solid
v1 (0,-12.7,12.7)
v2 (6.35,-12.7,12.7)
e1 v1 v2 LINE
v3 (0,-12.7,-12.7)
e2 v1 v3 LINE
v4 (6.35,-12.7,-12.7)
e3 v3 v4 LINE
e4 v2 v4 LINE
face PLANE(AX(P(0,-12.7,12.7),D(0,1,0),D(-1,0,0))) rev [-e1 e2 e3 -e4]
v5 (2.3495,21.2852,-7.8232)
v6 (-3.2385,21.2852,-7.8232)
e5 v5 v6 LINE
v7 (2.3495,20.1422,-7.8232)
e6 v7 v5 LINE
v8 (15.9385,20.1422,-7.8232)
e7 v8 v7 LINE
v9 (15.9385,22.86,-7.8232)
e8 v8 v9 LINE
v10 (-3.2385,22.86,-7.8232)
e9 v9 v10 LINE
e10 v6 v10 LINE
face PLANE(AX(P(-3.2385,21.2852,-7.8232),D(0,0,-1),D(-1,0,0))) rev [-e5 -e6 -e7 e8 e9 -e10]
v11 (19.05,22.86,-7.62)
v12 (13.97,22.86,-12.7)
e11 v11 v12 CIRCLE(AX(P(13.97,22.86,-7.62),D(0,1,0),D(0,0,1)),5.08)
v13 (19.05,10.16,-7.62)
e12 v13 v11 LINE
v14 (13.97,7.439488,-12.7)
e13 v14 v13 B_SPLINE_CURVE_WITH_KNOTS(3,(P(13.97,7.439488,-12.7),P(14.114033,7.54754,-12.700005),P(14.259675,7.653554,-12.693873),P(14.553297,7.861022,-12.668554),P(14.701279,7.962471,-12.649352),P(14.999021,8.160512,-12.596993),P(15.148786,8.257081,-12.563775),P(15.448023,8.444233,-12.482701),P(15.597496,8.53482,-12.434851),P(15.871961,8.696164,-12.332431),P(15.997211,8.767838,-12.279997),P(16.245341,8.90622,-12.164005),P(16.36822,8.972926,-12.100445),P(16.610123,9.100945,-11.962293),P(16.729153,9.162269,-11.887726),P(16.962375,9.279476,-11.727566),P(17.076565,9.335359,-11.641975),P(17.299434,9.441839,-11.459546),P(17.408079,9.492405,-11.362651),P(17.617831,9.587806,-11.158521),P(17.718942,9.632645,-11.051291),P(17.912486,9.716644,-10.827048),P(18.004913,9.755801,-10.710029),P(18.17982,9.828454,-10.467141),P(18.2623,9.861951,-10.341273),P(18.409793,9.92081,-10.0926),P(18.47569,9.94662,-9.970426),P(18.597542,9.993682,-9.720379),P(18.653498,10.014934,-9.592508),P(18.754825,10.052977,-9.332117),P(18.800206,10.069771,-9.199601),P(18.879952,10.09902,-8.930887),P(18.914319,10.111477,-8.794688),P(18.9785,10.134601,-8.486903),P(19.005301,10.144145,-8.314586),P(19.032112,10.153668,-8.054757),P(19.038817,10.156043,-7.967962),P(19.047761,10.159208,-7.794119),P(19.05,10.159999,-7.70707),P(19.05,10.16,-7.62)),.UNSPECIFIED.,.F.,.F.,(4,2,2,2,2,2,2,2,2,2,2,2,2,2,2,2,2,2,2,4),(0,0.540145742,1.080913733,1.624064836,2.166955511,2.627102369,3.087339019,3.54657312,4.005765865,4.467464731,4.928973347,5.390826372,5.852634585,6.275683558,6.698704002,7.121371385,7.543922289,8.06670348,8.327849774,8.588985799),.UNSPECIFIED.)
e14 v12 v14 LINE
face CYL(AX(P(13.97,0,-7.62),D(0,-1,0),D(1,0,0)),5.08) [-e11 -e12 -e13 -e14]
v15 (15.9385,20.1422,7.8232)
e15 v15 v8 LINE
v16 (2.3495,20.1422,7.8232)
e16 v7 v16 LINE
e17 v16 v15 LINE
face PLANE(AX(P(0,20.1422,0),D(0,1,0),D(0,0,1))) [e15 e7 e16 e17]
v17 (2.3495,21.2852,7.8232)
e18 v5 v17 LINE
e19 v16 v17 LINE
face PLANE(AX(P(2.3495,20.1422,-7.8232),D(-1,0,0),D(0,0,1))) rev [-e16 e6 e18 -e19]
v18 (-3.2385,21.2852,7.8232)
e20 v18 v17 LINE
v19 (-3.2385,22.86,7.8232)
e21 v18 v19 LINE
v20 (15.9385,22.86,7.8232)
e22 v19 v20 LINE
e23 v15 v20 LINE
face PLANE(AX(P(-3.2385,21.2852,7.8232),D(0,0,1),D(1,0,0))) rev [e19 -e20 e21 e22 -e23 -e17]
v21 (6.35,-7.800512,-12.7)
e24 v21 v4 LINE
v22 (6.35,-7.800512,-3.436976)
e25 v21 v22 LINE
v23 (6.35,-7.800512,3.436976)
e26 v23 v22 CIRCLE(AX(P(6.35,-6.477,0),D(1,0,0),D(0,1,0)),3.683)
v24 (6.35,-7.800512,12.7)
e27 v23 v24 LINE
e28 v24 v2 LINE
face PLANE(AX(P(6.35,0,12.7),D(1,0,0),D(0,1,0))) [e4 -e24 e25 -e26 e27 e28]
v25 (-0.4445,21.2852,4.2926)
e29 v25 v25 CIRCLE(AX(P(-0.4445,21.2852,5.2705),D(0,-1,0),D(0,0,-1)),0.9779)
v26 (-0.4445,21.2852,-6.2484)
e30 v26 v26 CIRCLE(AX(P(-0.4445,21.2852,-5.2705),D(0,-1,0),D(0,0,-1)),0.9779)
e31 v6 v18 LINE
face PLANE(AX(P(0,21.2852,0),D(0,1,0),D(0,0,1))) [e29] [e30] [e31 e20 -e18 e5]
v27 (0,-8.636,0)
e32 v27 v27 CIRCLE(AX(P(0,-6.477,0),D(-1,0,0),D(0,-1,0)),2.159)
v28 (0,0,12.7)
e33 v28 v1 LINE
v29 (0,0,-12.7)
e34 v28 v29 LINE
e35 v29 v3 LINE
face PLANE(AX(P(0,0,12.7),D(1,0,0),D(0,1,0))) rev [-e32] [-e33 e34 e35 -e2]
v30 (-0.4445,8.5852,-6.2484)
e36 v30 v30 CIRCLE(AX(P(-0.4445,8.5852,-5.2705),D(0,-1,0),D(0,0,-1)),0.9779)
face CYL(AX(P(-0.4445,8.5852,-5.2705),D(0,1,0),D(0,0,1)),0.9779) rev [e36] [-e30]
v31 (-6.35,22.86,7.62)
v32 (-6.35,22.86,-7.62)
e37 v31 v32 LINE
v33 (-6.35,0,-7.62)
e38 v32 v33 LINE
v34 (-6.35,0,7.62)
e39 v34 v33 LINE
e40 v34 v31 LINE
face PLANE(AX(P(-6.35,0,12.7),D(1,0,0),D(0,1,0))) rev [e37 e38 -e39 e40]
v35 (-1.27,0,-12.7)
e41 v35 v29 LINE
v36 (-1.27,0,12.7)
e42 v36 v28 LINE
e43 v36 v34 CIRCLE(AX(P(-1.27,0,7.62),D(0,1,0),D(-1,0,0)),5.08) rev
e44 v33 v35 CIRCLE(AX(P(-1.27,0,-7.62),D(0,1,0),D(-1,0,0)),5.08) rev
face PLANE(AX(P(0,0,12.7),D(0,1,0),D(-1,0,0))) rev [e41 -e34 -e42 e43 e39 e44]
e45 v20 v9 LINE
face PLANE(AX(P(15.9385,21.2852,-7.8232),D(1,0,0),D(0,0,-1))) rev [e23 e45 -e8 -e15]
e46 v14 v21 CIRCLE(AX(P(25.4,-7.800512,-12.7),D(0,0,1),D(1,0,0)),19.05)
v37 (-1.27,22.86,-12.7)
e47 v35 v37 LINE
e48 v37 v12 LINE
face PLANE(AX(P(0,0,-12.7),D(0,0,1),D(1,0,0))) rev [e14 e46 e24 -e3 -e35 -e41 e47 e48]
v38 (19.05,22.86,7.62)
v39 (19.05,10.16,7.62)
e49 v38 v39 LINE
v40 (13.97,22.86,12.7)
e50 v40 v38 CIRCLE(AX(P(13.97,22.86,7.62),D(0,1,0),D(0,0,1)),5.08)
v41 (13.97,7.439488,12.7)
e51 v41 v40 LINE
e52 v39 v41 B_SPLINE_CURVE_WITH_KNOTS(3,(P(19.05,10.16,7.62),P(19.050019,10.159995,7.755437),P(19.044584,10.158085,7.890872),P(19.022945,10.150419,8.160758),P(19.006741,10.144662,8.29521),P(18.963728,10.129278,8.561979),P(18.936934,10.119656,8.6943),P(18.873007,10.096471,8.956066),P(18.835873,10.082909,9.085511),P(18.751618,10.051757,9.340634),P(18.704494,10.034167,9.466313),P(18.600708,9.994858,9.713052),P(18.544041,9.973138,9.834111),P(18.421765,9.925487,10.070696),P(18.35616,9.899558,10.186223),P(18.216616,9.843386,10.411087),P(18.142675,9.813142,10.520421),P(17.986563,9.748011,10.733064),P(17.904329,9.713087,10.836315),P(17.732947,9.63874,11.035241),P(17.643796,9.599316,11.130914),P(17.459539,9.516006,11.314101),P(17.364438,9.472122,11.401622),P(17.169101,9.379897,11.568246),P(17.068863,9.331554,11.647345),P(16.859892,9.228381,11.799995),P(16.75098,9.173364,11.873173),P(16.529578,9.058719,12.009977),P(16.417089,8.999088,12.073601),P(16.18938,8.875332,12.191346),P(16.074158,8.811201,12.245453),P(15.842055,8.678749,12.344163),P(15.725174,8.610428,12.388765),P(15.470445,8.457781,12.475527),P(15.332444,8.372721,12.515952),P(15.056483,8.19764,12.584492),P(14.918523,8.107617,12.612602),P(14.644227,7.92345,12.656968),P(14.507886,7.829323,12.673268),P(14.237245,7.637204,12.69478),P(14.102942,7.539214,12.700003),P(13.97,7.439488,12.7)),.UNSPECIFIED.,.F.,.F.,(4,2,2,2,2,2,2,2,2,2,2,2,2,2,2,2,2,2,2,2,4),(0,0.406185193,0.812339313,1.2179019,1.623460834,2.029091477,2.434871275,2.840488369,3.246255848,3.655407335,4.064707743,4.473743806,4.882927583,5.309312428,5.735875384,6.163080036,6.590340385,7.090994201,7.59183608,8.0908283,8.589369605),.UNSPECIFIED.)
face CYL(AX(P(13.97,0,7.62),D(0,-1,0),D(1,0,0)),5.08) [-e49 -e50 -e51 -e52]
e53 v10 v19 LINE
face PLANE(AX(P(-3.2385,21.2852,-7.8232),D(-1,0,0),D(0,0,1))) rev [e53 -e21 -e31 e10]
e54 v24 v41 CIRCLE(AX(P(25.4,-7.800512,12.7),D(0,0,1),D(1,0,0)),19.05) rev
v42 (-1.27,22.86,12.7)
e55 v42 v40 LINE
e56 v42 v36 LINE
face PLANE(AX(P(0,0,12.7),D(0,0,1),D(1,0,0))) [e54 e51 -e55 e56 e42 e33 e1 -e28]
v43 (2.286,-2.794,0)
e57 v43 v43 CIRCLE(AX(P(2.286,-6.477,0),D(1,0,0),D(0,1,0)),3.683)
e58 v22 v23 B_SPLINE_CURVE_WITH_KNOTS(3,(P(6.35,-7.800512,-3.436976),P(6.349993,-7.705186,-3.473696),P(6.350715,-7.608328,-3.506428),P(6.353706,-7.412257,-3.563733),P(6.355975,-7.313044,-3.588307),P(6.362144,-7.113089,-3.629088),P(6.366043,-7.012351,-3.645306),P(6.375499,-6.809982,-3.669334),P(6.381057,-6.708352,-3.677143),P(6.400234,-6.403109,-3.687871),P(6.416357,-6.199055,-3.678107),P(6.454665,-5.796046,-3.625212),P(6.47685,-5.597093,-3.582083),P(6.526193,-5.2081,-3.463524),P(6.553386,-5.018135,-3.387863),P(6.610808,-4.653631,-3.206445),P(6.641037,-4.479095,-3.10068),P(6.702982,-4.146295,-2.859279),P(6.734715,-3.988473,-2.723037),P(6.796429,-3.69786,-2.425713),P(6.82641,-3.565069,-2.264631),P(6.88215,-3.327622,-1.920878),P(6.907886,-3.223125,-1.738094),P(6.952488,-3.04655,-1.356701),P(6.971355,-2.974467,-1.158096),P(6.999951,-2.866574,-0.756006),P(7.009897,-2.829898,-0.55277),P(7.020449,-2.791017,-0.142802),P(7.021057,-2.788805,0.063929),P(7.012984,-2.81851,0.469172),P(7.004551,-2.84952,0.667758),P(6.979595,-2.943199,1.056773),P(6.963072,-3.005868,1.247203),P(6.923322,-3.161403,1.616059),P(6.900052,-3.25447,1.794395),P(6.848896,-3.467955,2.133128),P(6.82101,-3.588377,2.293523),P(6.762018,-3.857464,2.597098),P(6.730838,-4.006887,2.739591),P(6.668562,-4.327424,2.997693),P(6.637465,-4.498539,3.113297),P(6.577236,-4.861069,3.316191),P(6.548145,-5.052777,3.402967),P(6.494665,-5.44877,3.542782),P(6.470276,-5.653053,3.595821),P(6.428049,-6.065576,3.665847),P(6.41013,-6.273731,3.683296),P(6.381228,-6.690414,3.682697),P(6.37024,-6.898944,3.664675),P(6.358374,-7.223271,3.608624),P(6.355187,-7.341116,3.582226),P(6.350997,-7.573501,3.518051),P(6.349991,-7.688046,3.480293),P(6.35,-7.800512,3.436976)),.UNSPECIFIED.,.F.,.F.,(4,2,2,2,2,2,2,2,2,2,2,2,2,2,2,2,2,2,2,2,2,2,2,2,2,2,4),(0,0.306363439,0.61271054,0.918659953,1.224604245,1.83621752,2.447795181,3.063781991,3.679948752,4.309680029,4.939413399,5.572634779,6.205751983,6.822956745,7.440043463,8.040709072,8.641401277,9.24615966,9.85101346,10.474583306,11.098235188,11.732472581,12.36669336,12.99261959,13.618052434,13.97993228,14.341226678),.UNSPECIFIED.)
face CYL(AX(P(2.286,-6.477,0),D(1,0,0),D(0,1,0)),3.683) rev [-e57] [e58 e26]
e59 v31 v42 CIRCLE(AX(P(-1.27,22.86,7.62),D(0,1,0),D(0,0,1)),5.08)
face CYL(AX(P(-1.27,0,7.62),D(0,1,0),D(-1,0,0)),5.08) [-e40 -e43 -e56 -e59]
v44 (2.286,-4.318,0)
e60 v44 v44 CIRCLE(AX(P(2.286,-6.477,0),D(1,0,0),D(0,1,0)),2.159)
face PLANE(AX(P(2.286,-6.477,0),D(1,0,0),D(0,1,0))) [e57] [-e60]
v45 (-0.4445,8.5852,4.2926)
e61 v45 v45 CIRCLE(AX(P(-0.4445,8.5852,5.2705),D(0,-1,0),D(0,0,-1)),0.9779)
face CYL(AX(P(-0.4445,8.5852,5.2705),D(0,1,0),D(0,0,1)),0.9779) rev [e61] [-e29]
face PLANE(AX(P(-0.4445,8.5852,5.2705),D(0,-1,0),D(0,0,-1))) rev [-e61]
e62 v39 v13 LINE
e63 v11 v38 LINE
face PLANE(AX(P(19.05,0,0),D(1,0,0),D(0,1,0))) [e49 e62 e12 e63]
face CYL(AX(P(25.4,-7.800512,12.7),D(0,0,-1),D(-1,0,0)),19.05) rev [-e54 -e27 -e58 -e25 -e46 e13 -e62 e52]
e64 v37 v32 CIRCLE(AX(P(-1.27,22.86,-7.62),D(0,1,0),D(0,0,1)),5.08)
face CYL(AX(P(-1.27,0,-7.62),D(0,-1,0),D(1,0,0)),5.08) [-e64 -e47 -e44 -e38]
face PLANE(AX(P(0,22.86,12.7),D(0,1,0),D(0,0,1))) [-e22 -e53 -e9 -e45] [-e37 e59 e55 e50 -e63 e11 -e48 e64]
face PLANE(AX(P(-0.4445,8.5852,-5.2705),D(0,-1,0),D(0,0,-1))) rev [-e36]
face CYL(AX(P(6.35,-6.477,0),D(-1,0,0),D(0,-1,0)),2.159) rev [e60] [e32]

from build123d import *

# Parameters (mm, degrees)
PROFILE_W               = 12.7
PROFILE_H               = 22.86
PROFILE_W_2             = 6.35
PROFILE_H_2             = 12.7
BOSS_EXTRUDE1_DEPTH     = 12.7
CUT_EXTRUDE1_DEPTH      = 27.910817528
CUT_EXTRUDE1_DEPTH_BACK = 27.910817528
SCREWHOLE_R             = 2.159
CUT_EXTRUDE2_START      = -4.064
SKETCH3_R               = 3.683
SKETCH3_R_2             = 2.159
CUT_EXTRUDE2_DEPTH      = 4.064
SKETCH4_W               = 25.4
SKETCH4_H               = 12.7
BOSS_EXTRUDE2_DEPTH     = 12.7
SKETCH6_W               = 19.177
SKETCH6_H               = 15.6464
CUT_EXTRUDE3_DEPTH      = 1.5748
SKETCH9_W               = 13.589
SKETCH9_H               = 15.6464
CUT_EXTRUDE5_DEPTH      = 1.143
SKETCH7_R               = 0.9779
CUT_EXTRUDE6_DEPTH      = 12.7
FILLET1_R               = 19.05
FILLET2_R               = 5.08


with BuildPart() as part:
    # Profile → Boss-Extrude1 (new, symmetric)
    with BuildSketch(Plane.XY):
        with Locations((0, 11.43)):
            Rectangle(PROFILE_W, PROFILE_H)
        with Locations((3.175, -6.35)):
            Rectangle(PROFILE_W_2, PROFILE_H_2)
    extrude(amount=BOSS_EXTRUDE1_DEPTH, both=True)

    # ScrewHole → Cut-Extrude1 (cut, two sides: drawn at the far end of the back side and taken through both)
    with BuildSketch(Plane.ZY.offset(-CUT_EXTRUDE1_DEPTH_BACK)):
        with Locations(Location((0, -6.477, 0), (0, 0, 270))):
            Circle(SCREWHOLE_R)
    extrude(amount=CUT_EXTRUDE1_DEPTH + CUT_EXTRUDE1_DEPTH_BACK, mode=Mode.SUBTRACT)

    # Sketch3 → Cut-Extrude2 (cut)
    with BuildSketch(Plane(origin=(6.35, 0, 0), x_dir=(0, 0, -1), z_dir=(1, 0, 0)).offset(CUT_EXTRUDE2_START)):
        with Locations(Location((0, -6.477, 0), (0, 0, 90))):
            Circle(SKETCH3_R)
        with Locations(Location((0, -6.477, 0), (0, 0, 270))):
            Circle(SKETCH3_R_2, mode=Mode.SUBTRACT)
    extrude(amount=CUT_EXTRUDE2_DEPTH, mode=Mode.SUBTRACT)

    # Sketch4 → Boss-Extrude2 (add)
    with BuildSketch(Plane(origin=(6.35, 0, 0), x_dir=(0, 0, -1), z_dir=(1, 0, 0))):
        with Locations((0, 16.51)):
            Rectangle(SKETCH4_W, SKETCH4_H)
    extrude(amount=BOSS_EXTRUDE2_DEPTH)

    # Sketch6 → Cut-Extrude3 (cut)
    with BuildSketch(Plane(origin=(0, 22.86, 0), x_dir=(1, 0, 0), z_dir=(0, 1, 0))):
        with Locations((6.35, 0)):
            Rectangle(SKETCH6_W, SKETCH6_H)
    extrude(amount=-CUT_EXTRUDE3_DEPTH, mode=Mode.SUBTRACT)

    # Sketch9 → Cut-Extrude5 (cut)
    with BuildSketch(Plane(origin=(0, 21.2852, 0), x_dir=(1, 0, 0), z_dir=(0, 1, 0))):
        with Locations((9.144, 0)):
            Rectangle(SKETCH9_W, SKETCH9_H)
    extrude(amount=-CUT_EXTRUDE5_DEPTH, mode=Mode.SUBTRACT)

    # Sketch7 → Cut-Extrude6 (cut)
    with BuildSketch(Plane(origin=(0, 21.2852, 0), x_dir=(1, 0, 0), z_dir=(0, 1, 0))):
        with Locations(Location((-0.4445, -5.2705, 0), (0, 0, 90))):
            Circle(SKETCH7_R)
        with Locations(Location((-0.4445, 5.2705, 0), (0, 0, 90))):
            Circle(SKETCH7_R)
    extrude(amount=-CUT_EXTRUDE6_DEPTH, mode=Mode.SUBTRACT)

    # Fillet1
    # the kernel refuses this fillet: 19.05 mm, written as the material it adds along each edge
    with BuildSketch(Plane(origin=(6.35, 10.16, -12.7), x_dir=(0, -1, 0), z_dir=(0, 0, 1))) as fillet1_piece_1_section:
        with BuildLine():
            CenterArc((17.960512242, 19.05), FILLET1_R, 199.471220634, 70.528779366)
            Line((0, 12.7), (0, 0))
            Line((0, 0), (17.960512242, 0))
        make_face()
    fillet1_piece_1 = extrude(amount=25.4, mode=Mode.PRIVATE)
    fillet1_piece_1 = fillet1_piece_1 - Plane(origin=(6.35, -6.477, 0), x_dir=(0, 1, 0), z_dir=(-1, 0, 0)) * Cylinder(3.683, 123, mode=Mode.PRIVATE)
    add(fillet1_piece_1)

    # Fillet2
    fillet2_edges = [part.edges().sort_by_distance(p)[0] for p in [
        (-6.35, 11.43, 12.7),
        (19.05, 16.51, 12.7),
        (19.05, 16.51, -12.7),
        (-6.35, 11.43, -12.7),
    ]]
    fillet(fillet2_edges, radius=FILLET2_R)


solid = part.part
